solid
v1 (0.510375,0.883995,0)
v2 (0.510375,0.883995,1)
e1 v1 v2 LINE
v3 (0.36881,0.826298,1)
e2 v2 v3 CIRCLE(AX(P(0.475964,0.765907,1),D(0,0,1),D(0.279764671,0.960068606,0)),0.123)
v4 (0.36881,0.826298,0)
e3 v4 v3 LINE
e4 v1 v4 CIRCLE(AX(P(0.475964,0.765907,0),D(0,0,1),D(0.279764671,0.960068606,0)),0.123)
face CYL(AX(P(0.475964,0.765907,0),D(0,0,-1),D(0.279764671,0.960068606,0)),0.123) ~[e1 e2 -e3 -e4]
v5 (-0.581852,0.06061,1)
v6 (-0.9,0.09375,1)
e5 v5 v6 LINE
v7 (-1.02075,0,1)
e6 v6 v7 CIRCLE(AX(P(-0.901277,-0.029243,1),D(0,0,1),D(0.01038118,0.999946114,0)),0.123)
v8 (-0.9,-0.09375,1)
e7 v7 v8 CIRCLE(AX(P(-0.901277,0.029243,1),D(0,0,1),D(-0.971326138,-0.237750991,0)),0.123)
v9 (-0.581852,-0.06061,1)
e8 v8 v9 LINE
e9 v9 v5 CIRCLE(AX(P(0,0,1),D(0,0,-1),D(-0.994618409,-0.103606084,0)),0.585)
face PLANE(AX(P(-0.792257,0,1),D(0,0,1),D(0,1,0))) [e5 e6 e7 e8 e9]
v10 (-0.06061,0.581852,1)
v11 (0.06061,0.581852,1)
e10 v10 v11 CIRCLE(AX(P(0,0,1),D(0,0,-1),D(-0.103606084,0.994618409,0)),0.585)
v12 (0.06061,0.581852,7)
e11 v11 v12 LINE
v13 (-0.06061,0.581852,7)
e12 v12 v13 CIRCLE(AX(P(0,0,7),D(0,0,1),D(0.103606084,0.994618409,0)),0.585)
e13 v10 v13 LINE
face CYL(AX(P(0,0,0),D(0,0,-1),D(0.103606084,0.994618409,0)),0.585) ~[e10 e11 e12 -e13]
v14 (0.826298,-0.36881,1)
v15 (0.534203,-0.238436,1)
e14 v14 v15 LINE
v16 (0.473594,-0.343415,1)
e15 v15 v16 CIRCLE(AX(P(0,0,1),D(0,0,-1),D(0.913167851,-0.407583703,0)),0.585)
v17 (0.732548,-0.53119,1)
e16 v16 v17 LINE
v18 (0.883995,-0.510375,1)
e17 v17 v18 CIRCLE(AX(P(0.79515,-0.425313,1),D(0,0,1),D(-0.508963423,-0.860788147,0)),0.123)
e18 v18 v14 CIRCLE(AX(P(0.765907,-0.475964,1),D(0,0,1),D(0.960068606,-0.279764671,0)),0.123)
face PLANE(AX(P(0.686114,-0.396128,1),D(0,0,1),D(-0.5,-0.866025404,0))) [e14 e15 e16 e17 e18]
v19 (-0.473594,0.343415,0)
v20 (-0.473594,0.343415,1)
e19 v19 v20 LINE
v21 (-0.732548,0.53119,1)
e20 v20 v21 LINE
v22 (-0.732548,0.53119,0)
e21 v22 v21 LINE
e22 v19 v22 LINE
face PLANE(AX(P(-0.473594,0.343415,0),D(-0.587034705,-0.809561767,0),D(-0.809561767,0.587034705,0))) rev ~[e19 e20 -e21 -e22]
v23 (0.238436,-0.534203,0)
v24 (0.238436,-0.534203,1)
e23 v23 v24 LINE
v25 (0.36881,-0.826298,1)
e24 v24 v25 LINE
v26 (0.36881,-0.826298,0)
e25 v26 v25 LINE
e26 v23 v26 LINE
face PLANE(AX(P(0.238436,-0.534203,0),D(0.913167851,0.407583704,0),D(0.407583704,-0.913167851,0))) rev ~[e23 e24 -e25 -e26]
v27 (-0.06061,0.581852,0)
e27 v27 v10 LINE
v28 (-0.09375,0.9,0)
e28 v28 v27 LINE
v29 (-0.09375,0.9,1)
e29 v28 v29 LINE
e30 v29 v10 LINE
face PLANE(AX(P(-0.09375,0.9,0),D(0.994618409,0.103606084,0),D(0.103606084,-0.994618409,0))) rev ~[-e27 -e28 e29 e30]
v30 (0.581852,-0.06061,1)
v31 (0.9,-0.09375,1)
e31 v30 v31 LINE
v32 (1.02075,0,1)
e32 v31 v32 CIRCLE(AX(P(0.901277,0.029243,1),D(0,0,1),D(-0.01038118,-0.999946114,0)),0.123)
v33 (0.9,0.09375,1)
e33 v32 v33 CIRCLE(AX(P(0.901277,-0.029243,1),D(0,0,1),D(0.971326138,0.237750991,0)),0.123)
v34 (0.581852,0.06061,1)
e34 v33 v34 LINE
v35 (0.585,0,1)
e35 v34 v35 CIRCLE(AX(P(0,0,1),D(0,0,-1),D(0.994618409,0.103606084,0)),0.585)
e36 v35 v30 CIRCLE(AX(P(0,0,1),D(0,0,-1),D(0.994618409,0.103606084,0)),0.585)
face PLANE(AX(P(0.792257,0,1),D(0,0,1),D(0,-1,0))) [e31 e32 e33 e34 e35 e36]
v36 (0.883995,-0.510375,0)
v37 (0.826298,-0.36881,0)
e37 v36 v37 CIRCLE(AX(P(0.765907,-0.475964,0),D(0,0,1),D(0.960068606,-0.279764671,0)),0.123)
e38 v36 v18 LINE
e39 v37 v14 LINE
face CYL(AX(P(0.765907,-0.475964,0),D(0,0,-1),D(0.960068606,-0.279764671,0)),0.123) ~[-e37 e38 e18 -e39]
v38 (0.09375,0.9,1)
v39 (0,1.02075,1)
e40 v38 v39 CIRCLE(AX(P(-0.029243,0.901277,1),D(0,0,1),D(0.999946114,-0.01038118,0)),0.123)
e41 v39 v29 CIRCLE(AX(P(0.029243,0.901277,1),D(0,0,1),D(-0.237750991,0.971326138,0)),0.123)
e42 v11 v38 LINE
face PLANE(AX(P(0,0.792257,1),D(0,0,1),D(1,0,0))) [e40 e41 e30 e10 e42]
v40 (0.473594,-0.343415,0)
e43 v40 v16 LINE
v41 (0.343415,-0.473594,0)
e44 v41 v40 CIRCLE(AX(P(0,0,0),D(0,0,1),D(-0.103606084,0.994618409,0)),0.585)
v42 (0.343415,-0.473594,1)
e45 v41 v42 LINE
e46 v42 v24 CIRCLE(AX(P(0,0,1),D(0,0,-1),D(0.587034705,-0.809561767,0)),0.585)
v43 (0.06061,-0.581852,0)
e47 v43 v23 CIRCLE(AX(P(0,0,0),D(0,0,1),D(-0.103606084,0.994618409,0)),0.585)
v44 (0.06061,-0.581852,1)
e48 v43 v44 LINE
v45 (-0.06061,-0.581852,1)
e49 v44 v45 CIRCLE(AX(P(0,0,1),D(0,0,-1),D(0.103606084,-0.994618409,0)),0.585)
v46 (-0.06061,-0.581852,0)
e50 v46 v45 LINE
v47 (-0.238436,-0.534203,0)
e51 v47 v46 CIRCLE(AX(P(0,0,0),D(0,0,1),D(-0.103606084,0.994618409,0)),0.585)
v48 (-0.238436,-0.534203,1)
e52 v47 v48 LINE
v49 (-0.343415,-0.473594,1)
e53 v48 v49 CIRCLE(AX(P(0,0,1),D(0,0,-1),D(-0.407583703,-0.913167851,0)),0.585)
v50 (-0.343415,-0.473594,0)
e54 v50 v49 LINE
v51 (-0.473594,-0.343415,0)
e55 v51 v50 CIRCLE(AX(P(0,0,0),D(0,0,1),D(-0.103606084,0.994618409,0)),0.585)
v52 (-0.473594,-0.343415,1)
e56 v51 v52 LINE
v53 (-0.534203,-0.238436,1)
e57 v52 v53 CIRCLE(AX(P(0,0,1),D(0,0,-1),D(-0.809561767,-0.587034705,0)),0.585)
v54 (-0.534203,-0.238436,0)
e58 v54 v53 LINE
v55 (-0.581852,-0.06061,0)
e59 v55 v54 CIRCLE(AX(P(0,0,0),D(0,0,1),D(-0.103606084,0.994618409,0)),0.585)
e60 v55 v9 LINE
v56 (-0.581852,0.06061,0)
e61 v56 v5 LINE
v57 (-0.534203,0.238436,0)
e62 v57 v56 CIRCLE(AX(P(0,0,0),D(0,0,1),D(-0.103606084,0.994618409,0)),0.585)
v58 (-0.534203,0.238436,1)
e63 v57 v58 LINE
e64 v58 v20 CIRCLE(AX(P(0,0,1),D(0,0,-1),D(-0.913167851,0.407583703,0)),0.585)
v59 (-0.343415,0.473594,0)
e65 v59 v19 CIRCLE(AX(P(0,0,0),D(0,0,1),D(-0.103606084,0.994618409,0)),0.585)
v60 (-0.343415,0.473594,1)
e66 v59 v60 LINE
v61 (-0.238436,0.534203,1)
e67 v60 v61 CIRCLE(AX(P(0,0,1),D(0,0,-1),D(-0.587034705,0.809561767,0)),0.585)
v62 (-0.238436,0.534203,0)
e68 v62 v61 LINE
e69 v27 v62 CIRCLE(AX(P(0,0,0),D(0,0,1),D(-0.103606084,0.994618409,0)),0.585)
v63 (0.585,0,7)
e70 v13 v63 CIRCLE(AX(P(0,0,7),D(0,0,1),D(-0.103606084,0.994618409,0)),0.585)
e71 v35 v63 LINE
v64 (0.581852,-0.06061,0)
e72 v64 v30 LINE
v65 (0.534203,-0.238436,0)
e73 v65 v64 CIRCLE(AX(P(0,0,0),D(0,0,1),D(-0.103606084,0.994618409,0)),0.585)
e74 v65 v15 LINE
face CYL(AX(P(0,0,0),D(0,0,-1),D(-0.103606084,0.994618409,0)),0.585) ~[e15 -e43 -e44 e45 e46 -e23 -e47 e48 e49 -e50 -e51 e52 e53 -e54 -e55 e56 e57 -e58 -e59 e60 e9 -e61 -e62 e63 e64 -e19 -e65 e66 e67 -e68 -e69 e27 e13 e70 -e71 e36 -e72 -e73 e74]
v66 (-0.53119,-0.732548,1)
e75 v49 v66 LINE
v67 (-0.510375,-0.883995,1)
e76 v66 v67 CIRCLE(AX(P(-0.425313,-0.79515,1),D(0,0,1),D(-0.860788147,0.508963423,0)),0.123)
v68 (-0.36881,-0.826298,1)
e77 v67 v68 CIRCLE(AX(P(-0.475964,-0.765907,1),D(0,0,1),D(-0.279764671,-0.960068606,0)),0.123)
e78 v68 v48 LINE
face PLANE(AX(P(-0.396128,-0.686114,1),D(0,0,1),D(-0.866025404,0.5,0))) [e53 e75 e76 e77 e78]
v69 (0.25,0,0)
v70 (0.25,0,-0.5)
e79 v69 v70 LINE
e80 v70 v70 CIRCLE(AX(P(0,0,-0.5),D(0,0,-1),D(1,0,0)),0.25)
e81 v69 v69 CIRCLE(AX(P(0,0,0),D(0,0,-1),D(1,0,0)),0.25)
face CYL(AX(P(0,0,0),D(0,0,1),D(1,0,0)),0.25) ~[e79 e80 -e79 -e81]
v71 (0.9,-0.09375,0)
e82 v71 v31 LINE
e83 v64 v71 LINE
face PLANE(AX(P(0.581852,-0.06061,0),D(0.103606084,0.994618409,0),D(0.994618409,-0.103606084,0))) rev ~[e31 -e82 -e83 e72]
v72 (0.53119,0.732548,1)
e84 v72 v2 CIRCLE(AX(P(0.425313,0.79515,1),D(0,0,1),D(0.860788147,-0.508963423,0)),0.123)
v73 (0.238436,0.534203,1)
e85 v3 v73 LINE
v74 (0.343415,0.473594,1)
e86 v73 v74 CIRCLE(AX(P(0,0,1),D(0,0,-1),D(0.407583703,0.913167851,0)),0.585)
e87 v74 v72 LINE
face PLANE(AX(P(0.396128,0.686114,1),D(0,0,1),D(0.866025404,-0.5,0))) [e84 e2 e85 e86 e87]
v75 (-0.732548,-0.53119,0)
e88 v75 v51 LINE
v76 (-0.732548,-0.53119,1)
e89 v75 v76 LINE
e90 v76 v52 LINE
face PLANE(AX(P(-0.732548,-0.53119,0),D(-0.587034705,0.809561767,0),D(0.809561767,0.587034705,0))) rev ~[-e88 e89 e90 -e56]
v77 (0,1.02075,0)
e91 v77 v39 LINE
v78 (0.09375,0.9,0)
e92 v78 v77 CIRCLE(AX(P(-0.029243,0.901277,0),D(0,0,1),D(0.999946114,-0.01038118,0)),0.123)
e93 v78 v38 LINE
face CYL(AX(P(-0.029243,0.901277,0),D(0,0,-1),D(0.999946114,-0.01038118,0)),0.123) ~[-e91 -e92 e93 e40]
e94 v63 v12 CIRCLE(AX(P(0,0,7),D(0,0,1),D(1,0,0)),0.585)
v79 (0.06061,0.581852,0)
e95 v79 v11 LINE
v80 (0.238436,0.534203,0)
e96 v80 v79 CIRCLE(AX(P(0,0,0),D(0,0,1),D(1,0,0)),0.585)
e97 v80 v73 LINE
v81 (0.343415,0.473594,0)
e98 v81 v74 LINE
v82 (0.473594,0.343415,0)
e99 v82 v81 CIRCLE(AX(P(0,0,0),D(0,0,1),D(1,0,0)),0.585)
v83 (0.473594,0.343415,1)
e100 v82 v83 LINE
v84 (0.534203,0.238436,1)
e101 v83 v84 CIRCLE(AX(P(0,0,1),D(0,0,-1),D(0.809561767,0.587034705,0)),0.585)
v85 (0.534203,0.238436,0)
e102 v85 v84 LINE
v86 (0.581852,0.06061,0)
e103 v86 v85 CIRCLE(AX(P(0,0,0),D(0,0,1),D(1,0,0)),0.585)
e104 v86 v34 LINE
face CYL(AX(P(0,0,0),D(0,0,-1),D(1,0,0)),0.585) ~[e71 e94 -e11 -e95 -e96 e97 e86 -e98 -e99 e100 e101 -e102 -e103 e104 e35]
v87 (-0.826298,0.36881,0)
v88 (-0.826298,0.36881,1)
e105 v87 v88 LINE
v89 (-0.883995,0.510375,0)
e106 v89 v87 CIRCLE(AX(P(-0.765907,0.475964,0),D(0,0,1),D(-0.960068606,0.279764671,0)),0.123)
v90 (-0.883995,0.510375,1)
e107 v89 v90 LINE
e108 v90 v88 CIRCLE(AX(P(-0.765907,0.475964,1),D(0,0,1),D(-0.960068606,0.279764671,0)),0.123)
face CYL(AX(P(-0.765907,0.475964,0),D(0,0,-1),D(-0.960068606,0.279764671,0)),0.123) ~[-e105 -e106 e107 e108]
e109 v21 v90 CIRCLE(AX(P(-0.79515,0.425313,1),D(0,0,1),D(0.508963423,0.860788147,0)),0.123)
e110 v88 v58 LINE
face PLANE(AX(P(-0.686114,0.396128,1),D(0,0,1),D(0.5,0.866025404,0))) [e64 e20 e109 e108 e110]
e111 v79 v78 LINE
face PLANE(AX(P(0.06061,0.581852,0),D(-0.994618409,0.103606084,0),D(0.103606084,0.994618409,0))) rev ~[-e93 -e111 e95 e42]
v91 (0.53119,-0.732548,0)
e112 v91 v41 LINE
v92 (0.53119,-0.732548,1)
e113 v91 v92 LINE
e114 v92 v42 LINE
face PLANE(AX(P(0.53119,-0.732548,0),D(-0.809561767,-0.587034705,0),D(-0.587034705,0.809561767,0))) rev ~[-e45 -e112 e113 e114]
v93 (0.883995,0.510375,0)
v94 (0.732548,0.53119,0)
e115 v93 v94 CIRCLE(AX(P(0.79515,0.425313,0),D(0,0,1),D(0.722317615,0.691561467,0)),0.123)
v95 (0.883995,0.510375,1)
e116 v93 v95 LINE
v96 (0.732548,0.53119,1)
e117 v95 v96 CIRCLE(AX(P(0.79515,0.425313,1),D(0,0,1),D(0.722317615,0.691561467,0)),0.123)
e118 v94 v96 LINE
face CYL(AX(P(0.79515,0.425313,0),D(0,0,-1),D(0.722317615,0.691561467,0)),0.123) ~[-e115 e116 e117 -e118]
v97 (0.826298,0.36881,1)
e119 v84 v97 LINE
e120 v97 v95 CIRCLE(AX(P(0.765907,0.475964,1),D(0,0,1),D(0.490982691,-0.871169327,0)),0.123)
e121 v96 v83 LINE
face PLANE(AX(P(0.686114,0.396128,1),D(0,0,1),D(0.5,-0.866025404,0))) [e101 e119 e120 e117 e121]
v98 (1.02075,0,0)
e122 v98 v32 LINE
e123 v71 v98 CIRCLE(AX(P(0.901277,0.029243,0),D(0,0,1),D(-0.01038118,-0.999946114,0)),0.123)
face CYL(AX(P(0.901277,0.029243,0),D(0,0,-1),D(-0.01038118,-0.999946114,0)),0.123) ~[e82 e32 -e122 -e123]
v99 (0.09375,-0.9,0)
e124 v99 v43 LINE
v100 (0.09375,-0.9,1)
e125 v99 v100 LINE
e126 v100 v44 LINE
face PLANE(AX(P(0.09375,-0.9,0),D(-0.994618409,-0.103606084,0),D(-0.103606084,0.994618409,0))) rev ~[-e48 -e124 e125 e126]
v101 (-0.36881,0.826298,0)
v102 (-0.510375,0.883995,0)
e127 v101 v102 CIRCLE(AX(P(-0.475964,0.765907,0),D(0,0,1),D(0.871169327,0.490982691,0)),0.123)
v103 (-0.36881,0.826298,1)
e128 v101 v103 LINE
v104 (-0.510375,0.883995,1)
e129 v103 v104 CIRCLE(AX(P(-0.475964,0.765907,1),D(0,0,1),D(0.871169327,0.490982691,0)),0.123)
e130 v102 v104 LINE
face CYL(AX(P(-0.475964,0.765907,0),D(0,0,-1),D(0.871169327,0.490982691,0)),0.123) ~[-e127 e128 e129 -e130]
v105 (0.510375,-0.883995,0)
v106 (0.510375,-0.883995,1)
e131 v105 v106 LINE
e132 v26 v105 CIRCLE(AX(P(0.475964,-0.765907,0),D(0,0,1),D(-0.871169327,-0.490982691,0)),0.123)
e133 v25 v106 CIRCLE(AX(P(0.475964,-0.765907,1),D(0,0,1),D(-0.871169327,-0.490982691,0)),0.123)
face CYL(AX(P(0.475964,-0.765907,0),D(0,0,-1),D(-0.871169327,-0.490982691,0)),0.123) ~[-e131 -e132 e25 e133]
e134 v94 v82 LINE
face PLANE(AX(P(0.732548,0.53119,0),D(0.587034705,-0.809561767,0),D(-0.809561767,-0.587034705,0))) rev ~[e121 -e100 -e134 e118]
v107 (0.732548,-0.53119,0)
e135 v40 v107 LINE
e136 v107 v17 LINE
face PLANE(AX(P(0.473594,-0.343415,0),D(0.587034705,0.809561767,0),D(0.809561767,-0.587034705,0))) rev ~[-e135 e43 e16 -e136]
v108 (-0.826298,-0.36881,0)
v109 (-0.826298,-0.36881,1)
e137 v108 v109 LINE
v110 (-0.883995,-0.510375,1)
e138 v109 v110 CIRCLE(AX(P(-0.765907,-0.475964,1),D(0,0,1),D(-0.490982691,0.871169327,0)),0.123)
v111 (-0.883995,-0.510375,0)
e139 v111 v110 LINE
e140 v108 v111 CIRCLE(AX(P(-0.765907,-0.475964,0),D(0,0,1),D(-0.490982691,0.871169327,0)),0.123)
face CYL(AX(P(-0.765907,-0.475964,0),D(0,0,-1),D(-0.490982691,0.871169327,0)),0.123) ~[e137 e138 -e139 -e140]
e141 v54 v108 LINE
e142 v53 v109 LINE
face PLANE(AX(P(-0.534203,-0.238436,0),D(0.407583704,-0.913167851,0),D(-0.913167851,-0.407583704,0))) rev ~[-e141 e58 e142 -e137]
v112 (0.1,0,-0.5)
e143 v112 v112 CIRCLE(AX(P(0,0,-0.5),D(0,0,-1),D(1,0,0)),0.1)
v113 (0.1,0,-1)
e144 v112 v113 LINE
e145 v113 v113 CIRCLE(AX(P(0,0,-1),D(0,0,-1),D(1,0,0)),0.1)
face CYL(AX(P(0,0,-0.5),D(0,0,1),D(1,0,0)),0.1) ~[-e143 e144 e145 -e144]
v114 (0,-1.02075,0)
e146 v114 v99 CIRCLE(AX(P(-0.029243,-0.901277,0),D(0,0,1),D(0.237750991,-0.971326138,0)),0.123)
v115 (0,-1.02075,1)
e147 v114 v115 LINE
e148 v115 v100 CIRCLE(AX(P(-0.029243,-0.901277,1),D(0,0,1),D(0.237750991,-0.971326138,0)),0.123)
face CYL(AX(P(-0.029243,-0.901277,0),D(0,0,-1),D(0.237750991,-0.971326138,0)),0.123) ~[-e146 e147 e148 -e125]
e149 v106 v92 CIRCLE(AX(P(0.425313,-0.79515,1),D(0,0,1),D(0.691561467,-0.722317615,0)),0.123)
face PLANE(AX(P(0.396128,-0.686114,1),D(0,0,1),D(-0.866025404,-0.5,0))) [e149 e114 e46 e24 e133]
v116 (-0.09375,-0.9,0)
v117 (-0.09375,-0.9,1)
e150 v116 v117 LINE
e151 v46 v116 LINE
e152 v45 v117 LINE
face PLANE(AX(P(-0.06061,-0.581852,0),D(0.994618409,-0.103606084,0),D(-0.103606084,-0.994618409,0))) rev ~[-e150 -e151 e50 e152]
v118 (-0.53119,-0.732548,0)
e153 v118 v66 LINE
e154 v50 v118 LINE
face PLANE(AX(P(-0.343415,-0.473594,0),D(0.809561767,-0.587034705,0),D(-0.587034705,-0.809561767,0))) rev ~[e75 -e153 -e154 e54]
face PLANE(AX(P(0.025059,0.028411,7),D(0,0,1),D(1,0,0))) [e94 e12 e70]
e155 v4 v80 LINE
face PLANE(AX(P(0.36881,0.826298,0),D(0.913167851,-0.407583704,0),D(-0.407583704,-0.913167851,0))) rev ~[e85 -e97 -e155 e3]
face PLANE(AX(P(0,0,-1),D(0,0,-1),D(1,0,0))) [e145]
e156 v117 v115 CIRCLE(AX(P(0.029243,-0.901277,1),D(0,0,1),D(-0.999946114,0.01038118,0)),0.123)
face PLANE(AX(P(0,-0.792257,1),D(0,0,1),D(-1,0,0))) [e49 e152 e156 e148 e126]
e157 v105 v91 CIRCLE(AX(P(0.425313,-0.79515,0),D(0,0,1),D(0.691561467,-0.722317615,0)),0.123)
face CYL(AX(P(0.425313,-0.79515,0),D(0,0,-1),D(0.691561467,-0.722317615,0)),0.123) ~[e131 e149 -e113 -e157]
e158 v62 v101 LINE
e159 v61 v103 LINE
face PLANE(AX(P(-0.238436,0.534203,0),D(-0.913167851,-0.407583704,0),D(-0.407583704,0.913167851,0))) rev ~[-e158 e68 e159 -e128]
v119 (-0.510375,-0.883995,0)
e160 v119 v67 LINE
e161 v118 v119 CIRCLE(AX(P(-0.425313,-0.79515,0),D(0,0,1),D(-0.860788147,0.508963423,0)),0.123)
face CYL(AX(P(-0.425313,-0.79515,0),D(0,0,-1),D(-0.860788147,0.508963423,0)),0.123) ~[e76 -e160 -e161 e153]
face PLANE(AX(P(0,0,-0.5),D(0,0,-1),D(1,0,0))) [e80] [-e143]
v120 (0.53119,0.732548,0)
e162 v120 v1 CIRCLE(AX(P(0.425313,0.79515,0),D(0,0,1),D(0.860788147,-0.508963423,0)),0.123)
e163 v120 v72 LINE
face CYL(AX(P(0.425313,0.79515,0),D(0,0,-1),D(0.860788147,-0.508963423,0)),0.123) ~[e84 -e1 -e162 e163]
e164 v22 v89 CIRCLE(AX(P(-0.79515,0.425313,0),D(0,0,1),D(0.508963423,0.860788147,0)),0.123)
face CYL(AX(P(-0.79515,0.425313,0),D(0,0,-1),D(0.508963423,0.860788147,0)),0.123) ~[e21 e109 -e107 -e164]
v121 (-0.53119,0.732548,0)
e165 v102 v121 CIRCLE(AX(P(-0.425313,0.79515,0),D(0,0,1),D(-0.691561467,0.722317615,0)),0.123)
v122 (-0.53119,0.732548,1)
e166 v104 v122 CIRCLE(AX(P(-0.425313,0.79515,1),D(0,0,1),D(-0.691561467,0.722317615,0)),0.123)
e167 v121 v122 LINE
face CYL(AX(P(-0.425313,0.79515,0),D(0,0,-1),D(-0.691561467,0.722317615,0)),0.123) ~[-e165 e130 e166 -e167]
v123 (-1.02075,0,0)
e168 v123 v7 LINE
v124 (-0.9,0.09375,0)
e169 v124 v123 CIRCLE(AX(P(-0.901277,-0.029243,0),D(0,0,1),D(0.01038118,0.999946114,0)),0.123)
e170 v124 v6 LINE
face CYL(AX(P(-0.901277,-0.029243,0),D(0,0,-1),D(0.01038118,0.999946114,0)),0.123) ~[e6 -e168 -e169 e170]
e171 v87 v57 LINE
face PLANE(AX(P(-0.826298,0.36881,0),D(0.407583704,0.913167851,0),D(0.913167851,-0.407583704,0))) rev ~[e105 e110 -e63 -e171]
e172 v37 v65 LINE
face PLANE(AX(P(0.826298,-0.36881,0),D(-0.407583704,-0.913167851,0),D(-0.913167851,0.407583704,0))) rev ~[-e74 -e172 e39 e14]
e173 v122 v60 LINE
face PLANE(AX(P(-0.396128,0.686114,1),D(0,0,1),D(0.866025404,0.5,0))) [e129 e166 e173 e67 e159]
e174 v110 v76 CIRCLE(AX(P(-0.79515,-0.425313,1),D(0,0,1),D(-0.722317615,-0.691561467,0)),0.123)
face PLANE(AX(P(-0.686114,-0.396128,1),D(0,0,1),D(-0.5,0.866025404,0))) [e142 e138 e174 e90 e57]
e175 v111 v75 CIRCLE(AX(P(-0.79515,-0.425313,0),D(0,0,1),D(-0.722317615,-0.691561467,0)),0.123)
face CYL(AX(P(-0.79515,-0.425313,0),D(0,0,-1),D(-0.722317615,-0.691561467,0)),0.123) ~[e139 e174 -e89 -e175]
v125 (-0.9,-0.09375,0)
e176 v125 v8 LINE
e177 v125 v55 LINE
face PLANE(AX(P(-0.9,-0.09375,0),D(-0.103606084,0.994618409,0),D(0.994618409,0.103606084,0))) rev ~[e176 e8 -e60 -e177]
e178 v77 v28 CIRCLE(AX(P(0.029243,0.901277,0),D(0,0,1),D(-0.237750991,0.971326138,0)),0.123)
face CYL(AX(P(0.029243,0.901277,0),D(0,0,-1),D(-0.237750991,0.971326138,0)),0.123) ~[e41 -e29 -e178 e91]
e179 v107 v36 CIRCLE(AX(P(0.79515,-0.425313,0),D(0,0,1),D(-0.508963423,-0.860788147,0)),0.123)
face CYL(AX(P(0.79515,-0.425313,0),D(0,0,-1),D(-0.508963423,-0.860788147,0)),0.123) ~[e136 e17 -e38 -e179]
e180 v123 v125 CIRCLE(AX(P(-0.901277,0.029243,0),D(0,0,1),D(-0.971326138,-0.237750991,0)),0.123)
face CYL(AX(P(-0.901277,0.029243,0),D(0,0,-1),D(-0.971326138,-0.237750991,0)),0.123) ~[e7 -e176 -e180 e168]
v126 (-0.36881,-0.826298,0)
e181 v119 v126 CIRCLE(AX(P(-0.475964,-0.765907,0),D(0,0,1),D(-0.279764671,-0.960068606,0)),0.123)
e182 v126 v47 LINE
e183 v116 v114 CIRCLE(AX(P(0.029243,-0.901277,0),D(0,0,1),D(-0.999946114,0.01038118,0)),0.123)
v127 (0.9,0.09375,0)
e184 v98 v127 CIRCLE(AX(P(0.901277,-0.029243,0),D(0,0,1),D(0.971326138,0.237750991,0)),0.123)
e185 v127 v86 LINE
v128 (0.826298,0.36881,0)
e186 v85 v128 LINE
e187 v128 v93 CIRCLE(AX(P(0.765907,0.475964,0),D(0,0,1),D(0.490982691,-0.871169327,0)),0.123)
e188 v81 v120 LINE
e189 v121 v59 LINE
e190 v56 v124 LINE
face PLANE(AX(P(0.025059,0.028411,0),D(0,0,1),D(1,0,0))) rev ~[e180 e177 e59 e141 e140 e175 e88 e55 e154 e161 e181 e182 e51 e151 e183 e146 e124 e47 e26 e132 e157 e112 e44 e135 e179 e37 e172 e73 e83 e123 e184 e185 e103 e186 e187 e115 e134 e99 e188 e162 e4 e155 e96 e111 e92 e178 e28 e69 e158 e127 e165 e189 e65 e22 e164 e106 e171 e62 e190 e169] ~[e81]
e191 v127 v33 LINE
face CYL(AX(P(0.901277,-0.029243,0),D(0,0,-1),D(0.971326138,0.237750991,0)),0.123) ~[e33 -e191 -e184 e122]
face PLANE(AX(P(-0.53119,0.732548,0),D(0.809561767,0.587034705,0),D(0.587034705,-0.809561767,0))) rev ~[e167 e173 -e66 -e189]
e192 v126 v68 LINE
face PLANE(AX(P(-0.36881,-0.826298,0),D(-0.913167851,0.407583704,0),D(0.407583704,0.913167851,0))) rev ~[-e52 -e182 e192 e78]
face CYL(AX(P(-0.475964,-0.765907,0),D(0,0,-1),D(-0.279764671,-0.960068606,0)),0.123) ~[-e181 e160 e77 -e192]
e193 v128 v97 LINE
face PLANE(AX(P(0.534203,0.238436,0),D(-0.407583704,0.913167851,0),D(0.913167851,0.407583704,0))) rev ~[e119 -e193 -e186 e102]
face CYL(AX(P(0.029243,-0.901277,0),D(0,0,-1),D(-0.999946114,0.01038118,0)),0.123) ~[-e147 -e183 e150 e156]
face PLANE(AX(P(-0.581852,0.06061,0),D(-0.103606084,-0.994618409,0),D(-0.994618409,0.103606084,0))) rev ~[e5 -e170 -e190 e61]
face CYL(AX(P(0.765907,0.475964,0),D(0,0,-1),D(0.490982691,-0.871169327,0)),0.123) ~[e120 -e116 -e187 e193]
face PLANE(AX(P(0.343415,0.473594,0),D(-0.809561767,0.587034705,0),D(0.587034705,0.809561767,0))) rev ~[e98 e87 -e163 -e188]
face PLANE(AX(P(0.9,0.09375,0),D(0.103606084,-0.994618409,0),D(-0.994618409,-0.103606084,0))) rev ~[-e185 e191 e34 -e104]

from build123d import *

# Parameters (mm, degrees)
F1_DEPTH        = 1
F1_COPIES_COUNT = 12
F3_DEPTH        = 7
F5_R            = 0.25
F6_DEPTH        = 0.5
F7_R            = 0.1
F8_DEPTH        = 0.5


# Not quite as in the source:
# - a feature of the source that left no trace in its solid (it failed there, or was rolled back) is left out
# - a pattern or mirror of a feature is missing from the dataset's text; its kind, count and spacing are read off the source's solid


with BuildPart() as f1:
    # F0 (on Top) → F1 (new body)
    with BuildSketch(Plane.XY):
        with BuildLine():
            ThreePointArc((0, 1.02075), (-0.0679119016, 0.9767079981), (-0.09375, 0.9))
            Line((-0.09375, 0.9), (-0.0606095593, 0.5818517692))
            ThreePointArc((-0.0606095593, 0.5818517692), (0, 0.585), (0.0606095593, 0.5818517692))
            Line((0.0606095593, 0.5818517692), (0.09375, 0.9))
            ThreePointArc((0.09375, 0.9), (0.0679119016, 0.9767079981), (0, 1.02075))
        make_face()
    extrude(amount=F1_DEPTH)


with BuildPart() as f1_copies_1:
    # F1_copies: instance of F1
    add(f1.part.rotate(Axis((0, 0, 0), (0, 0, 1)), 1 * 360 / F1_COPIES_COUNT))


with BuildPart() as f1_copies_2:
    # F1_copies: instance of F1
    add(f1.part.rotate(Axis((0, 0, 0), (0, 0, 1)), 2 * 360 / F1_COPIES_COUNT))


with BuildPart() as f1_copies_3:
    # F1_copies: instance of F1
    add(f1.part.rotate(Axis((0, 0, 0), (0, 0, 1)), 3 * 360 / F1_COPIES_COUNT))


with BuildPart() as f1_copies_4:
    # F1_copies: instance of F1
    add(f1.part.rotate(Axis((0, 0, 0), (0, 0, 1)), 4 * 360 / F1_COPIES_COUNT))


with BuildPart() as f1_copies_5:
    # F1_copies: instance of F1
    add(f1.part.rotate(Axis((0, 0, 0), (0, 0, 1)), 5 * 360 / F1_COPIES_COUNT))


with BuildPart() as f1_copies_6:
    # F1_copies: instance of F1
    add(f1.part.rotate(Axis((0, 0, 0), (0, 0, 1)), 6 * 360 / F1_COPIES_COUNT))


with BuildPart() as f1_copies_7:
    # F1_copies: instance of F1
    add(f1.part.rotate(Axis((0, 0, 0), (0, 0, 1)), 7 * 360 / F1_COPIES_COUNT))


with BuildPart() as f1_copies_8:
    # F1_copies: instance of F1
    add(f1.part.rotate(Axis((0, 0, 0), (0, 0, 1)), 8 * 360 / F1_COPIES_COUNT))


with BuildPart() as f1_copies_9:
    # F1_copies: instance of F1
    add(f1.part.rotate(Axis((0, 0, 0), (0, 0, 1)), 9 * 360 / F1_COPIES_COUNT))


with BuildPart() as f1_copies_10:
    # F1_copies: instance of F1
    add(f1.part.rotate(Axis((0, 0, 0), (0, 0, 1)), 10 * 360 / F1_COPIES_COUNT))


with BuildPart() as f1_copies_11:
    # F1_copies: instance of F1
    add(f1.part.rotate(Axis((0, 0, 0), (0, 0, 1)), 11 * 360 / F1_COPIES_COUNT))


with BuildPart() as f1_1:
    add(f1.part)

    add(f1_copies_1.part)  # F3 merges F1_copies_1

    add(f1_copies_2.part)  # F3 merges F1_copies_2

    add(f1_copies_3.part)  # F3 merges F1_copies_3

    add(f1_copies_4.part)  # F3 merges F1_copies_4

    add(f1_copies_5.part)  # F3 merges F1_copies_5

    add(f1_copies_6.part)  # F3 merges F1_copies_6

    add(f1_copies_7.part)  # F3 merges F1_copies_7

    add(f1_copies_8.part)  # F3 merges F1_copies_8

    add(f1_copies_9.part)  # F3 merges F1_copies_9

    add(f1_copies_10.part)  # F3 merges F1_copies_10

    add(f1_copies_11.part)  # F3 merges F1_copies_11
    # F0 (on Top) → F3 (join)
    with BuildSketch(Plane.XY):
        with BuildLine():
            ThreePointArc((0.0606095593, 0.5818517692), (0, 0.585), (-0.0606095593, 0.5818517692))
            ThreePointArc((-0.0606095593, 0.5818517692), (-0.3916429546, -0.4345581619), (0.585, 0))
            ThreePointArc((0.585, 0), (0.4345581619, 0.3916429546), (0.0606095593, 0.5818517692))
        make_face()
    extrude(amount=F3_DEPTH)

    # F4: union 

    # F5 (on face) → F6 (join)
    with BuildSketch(Plane(origin=(0, 0, 0), x_dir=(1, 0, 0), z_dir=(0, 0, -1))):
        Circle(F5_R)
    extrude(amount=F6_DEPTH)

    # F7 (on face) → F8 (join)
    with BuildSketch(Plane(origin=(0, 0, -0.5), x_dir=(1, 0, 0), z_dir=(0, 0, -1))):
        Circle(F7_R)
    extrude(amount=F8_DEPTH)


solid = f1_1.part
